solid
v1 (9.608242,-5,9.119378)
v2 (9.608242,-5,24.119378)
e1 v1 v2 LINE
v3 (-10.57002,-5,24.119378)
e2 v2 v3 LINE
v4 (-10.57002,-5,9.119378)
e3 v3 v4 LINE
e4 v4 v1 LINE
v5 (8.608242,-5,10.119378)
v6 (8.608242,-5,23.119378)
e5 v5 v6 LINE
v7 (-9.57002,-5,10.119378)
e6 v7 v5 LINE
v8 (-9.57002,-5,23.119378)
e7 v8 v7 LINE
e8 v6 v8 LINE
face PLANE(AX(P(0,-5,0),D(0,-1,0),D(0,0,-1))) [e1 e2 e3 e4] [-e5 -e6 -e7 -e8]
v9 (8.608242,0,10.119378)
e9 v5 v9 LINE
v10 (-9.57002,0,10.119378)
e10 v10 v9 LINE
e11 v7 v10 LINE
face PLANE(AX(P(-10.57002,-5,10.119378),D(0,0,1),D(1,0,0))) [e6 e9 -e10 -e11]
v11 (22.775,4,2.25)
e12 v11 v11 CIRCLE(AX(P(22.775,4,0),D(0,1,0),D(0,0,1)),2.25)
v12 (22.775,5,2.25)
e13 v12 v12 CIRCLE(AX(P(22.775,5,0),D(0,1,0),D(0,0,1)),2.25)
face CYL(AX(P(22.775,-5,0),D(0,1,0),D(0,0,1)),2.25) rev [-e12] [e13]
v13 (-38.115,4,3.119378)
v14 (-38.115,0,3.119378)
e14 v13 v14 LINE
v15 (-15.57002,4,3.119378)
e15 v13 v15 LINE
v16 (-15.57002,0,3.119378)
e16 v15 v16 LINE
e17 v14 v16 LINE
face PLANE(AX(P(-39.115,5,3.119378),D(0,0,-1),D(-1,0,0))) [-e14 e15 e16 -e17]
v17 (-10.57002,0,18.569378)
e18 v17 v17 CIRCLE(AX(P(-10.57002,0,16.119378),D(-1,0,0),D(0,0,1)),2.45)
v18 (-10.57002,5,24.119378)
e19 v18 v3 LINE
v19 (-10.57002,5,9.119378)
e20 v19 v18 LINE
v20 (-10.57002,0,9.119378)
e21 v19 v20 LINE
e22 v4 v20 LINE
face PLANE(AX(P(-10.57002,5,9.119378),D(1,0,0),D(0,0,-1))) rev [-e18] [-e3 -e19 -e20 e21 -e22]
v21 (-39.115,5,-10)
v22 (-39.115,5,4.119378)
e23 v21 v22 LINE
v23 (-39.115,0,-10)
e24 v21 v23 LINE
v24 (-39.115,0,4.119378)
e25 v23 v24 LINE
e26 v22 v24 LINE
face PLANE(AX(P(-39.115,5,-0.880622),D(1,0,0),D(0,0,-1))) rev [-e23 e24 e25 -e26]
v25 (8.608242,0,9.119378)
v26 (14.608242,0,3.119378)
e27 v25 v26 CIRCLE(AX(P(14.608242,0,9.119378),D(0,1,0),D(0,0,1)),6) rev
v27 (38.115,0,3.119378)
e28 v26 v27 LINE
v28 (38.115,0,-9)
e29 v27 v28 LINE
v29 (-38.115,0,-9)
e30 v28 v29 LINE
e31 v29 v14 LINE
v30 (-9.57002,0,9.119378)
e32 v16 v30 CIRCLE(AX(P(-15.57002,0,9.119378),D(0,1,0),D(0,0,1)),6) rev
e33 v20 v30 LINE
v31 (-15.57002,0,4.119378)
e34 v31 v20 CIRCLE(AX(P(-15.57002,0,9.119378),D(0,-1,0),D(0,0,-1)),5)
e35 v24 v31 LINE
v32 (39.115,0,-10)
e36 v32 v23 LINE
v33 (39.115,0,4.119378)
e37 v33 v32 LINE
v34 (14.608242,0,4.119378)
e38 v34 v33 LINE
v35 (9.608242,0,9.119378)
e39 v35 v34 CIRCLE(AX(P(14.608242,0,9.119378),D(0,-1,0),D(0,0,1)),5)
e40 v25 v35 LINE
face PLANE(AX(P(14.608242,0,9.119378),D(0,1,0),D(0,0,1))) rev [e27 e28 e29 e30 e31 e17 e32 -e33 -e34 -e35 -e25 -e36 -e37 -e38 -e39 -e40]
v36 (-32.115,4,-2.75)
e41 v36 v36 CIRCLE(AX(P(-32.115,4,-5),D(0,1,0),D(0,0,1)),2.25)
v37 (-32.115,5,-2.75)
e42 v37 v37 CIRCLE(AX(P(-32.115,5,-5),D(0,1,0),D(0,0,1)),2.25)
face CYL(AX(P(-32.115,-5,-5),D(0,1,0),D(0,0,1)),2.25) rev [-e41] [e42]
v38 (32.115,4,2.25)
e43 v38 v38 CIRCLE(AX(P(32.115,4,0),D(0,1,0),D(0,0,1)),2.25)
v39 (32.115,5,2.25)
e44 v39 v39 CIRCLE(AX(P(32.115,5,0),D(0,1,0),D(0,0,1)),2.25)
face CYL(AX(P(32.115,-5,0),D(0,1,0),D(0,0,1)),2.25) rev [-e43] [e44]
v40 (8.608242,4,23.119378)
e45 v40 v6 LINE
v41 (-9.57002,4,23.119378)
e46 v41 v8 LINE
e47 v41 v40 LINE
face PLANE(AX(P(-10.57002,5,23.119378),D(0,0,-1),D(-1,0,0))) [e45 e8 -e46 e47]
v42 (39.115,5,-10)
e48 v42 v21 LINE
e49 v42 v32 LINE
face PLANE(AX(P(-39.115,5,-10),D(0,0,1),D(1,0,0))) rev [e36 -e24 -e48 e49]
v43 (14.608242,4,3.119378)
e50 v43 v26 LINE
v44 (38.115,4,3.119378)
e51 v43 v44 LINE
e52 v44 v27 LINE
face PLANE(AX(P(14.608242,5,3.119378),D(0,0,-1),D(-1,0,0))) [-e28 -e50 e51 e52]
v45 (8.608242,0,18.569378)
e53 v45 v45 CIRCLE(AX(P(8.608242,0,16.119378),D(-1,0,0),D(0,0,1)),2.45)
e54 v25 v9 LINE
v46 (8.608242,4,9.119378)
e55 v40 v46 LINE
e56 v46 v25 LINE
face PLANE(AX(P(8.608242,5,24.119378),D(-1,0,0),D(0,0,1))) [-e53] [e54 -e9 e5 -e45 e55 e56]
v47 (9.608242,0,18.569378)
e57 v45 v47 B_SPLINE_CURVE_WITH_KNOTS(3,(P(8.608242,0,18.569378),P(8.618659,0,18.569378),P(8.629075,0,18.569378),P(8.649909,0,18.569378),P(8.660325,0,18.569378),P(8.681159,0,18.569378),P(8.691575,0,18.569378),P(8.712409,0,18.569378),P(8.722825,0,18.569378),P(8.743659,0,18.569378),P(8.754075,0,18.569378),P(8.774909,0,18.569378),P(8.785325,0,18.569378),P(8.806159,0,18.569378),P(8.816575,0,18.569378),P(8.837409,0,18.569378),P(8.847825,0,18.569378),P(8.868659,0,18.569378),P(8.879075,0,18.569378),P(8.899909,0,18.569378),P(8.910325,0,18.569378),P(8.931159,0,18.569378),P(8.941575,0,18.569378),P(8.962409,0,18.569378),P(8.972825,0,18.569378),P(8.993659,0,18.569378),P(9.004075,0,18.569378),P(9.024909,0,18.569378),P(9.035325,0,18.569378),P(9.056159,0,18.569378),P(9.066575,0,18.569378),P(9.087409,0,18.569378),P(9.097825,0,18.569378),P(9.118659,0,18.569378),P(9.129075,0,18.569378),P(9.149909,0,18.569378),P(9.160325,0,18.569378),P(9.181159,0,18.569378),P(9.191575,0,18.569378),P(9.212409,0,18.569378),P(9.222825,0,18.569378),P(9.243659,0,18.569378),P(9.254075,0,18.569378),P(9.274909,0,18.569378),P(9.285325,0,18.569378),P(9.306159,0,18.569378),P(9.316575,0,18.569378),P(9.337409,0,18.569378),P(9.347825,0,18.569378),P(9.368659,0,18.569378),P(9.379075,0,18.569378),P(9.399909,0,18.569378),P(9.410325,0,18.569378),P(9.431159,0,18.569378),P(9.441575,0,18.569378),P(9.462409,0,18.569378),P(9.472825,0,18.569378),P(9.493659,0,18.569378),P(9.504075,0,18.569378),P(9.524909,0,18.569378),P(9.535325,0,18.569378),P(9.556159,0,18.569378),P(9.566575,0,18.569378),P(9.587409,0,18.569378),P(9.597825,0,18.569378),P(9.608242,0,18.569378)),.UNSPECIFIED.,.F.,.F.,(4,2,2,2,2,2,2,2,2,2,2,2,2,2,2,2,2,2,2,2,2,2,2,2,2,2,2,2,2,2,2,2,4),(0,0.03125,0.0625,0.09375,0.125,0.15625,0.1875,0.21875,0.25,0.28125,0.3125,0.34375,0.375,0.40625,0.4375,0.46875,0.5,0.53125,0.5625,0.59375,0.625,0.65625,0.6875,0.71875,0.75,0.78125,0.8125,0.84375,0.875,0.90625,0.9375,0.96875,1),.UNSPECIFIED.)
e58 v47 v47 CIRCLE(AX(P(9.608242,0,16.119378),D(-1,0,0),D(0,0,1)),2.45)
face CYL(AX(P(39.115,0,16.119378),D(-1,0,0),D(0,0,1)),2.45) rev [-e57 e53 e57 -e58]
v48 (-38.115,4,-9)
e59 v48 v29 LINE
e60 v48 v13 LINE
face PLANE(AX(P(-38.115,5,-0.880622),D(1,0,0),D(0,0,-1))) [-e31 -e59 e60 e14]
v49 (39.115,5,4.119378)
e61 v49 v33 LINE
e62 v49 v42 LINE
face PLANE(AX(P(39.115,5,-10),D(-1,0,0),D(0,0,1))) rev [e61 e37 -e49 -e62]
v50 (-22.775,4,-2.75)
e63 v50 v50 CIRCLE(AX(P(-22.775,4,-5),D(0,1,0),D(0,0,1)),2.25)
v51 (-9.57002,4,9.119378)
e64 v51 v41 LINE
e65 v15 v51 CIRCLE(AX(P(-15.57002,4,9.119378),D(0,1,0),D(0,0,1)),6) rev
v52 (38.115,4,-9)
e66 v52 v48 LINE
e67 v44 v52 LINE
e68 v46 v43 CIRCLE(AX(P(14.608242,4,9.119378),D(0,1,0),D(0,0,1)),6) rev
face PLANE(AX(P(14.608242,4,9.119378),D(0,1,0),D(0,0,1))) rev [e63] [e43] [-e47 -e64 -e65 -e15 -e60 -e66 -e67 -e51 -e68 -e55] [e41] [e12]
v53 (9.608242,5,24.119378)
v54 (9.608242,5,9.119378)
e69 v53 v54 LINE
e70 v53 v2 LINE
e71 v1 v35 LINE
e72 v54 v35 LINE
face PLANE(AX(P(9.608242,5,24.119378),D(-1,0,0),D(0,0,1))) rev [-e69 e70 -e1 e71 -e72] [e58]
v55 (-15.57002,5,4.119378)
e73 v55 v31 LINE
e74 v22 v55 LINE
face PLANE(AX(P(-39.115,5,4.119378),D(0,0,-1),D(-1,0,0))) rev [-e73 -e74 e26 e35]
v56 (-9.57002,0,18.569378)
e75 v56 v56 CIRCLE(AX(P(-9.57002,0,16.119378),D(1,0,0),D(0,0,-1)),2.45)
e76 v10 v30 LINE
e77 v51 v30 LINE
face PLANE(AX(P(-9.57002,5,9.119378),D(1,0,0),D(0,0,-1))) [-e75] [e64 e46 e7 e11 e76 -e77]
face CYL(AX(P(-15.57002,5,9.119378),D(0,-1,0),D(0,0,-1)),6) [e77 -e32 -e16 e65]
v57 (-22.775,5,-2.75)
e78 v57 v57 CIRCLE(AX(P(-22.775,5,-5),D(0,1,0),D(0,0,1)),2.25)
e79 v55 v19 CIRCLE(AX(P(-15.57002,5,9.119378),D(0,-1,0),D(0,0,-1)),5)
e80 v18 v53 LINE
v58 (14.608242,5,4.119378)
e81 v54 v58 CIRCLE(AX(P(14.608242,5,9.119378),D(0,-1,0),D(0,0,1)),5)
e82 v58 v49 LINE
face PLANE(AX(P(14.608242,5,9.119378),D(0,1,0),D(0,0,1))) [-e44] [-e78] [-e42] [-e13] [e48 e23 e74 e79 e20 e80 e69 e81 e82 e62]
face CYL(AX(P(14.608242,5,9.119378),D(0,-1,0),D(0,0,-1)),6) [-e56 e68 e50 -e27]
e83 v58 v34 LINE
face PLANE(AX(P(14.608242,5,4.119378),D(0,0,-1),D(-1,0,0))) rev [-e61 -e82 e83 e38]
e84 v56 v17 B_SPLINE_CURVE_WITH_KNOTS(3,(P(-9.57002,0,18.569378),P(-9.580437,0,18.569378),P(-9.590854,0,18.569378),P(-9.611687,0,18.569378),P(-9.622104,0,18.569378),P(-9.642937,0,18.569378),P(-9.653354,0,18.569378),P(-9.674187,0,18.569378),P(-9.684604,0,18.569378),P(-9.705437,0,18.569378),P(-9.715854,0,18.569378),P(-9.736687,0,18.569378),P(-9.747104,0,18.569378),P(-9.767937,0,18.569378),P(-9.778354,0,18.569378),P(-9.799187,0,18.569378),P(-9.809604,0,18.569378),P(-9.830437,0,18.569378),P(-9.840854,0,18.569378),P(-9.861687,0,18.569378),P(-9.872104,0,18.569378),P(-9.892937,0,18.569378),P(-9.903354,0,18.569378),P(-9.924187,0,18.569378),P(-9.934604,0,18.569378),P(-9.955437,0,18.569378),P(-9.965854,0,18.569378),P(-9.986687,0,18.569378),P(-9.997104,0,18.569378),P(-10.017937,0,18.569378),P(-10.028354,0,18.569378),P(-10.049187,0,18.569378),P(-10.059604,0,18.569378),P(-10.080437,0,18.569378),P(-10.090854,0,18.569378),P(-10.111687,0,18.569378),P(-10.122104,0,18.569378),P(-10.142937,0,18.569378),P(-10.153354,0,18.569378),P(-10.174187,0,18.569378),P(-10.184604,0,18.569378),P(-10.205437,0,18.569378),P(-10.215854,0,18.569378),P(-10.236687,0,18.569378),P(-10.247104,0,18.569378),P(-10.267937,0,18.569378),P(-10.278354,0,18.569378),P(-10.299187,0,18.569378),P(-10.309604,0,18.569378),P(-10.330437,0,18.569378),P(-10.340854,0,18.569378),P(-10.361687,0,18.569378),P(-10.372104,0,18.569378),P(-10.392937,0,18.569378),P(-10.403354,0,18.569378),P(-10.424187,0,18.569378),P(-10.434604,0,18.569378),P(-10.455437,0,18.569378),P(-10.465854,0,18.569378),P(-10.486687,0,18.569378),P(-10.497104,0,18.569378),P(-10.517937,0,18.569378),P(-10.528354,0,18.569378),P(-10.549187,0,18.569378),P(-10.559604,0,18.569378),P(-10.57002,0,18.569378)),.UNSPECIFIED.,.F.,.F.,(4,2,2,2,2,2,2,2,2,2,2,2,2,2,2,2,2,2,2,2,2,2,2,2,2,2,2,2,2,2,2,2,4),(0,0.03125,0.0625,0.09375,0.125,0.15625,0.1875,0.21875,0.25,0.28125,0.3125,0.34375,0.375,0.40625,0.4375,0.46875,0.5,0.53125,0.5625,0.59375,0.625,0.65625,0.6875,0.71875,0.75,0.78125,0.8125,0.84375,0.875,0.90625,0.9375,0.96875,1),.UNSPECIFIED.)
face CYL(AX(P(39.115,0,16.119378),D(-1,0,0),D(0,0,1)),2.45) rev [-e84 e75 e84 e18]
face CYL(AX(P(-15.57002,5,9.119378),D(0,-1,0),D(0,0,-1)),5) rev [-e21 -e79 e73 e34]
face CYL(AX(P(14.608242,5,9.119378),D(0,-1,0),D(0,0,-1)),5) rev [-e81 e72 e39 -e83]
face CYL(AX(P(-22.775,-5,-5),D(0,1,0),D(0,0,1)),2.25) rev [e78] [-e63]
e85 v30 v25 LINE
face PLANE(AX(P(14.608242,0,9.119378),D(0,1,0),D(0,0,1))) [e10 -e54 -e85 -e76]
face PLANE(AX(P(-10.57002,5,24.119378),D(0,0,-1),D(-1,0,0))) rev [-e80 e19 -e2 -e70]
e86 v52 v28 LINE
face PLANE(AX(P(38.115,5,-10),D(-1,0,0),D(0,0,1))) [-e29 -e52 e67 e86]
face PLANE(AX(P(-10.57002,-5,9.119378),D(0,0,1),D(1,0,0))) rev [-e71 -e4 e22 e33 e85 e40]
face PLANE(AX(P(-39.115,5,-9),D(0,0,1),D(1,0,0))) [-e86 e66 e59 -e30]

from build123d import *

# Parameters (mm, degrees)
BOSS_EXTRUDE1_DEPTH = 5
SKETCH8_W           = 20.178262132
SKETCH8_H           = 15
BOSS_EXTRUDE2_DEPTH = 5
SHELL4_DEPTH        = 4
SHELL4_START        = -5
SHELL4_2_OUTLINE_W  = 18.178262132
SHELL4_2_OUTLINE_H  = 13
SHELL4_2_DEPTH      = 5
SKETCH9_R           = 2.45
CUT_EXTRUDE3_DEPTH  = 56.455798629
SKETCH10_R          = 2.25
CUT_EXTRUDE4_DEPTH  = 10


# Read off the part's stored shape, not the designer's step: Shell4
with BuildPart() as part:
    # Sketch2 → Boss-Extrude1 (new body)
    with BuildSketch(Plane(origin=(0, 0, 0), x_dir=(1, 0, 0), z_dir=(0, 1, 0))):
        with BuildLine():
            Line((-39.115, 0.880622479), (-39.115, 10))
            Line((-39.115, 10), (39.115, 10))
            Line((39.115, 10), (39.115, 0.880622479))
            Line((39.115, 0.880622479), (39.115, -4.119377521))
            Line((39.115, -4.119377521), (14.608241959, -4.119377521))
            ThreePointArc((14.608241959, -4.119377521), (11.072708053, -5.583843615), (9.608241959, -9.119377521))
            Line((9.608241959, -9.119377521), (9.608241959, -24.119377521))
            Line((9.608241959, -24.119377521), (-10.570020173, -24.119377521))
            Line((-10.570020173, -24.119377521), (-10.570020173, -9.119377521))
            ThreePointArc((-10.570020173, -9.119377521), (-12.034486267, -5.583843615), (-15.570020173, -4.119377521))
            Line((-15.570020173, -4.119377521), (-39.115, -4.119377521))
            Line((-39.115, -4.119377521), (-39.115, 0.880622479))
        make_face()
    extrude(amount=BOSS_EXTRUDE1_DEPTH)

    # Sketch8 → Boss-Extrude2 (add)
    with BuildSketch(Plane.XZ):
        with Locations((-0.480889107, 16.619377521)):
            Rectangle(SKETCH8_W, SKETCH8_H)
    extrude(amount=BOSS_EXTRUDE2_DEPTH)

    # Shell4 outline → Shell4 (cut)
    with BuildSketch(Plane(origin=(0, 0, 0), x_dir=(1, 0, 0), z_dir=(0, 1, 0))):
        with BuildLine():
            Line((38.115, 9), (-38.115, 9))
            Line((-38.115, 9), (-38.115, -3.119377521))
            Line((-38.115, -3.119377521), (-15.570020173, -3.119377521))
            ThreePointArc((-15.570020173, -3.119377521), (-11.327379486, -4.876736834), (-9.570020173, -9.119377521))
            Line((-9.570020173, -9.119377521), (-9.570020173, -23.119377521))
            Line((-9.570020173, -23.119377521), (8.608241959, -23.119377521))
            Line((8.608241959, -23.119377521), (8.608241959, -9.119377521))
            ThreePointArc((8.608241959, -9.119377521), (10.365601272, -4.876736834), (14.608241959, -3.119377521))
            Line((14.608241959, -3.119377521), (38.115, -3.119377521))
            Line((38.115, -3.119377521), (38.115, 9))
        make_face()
    extrude(amount=SHELL4_DEPTH, mode=Mode.SUBTRACT)

    # Shell4 2 outline → Shell4 2 (cut)
    with BuildSketch(Plane(origin=(0, 0, 0), x_dir=(1, 0, 0), z_dir=(0, 1, 0)).offset(SHELL4_START)):
        with Locations((-0.480889107, -16.619377521)):
            Rectangle(SHELL4_2_OUTLINE_W, SHELL4_2_OUTLINE_H)
    extrude(amount=SHELL4_2_DEPTH, mode=Mode.SUBTRACT)

    # Sketch9 → Cut-Extrude3 (cut, through all)
    with BuildSketch(Plane.ZY.offset(10.570020173)):
        with Locations((16.119377521, 0)):
            Circle(SKETCH9_R)
    extrude(amount=-CUT_EXTRUDE3_DEPTH, mode=Mode.SUBTRACT)

    # Sketch10 → Cut-Extrude4 (cut)
    with BuildSketch(Plane(origin=(0, 5, 0), x_dir=(1, 0, 0), z_dir=(0, 1, 0))):
        with Locations(Location((-32.115, 5, 0), (0, 0, 270))):
            Circle(SKETCH10_R)
        with Locations(Location((-22.775, 5, 0), (0, 0, 270))):
            Circle(SKETCH10_R)
        with Locations(Location((32.115, 0, 0), (0, 0, 270))):
            Circle(SKETCH10_R)
        with Locations(Location((22.775, 0, 0), (0, 0, 270))):
            Circle(SKETCH10_R)
    extrude(amount=-CUT_EXTRUDE4_DEPTH, mode=Mode.SUBTRACT)


solid = part.part
